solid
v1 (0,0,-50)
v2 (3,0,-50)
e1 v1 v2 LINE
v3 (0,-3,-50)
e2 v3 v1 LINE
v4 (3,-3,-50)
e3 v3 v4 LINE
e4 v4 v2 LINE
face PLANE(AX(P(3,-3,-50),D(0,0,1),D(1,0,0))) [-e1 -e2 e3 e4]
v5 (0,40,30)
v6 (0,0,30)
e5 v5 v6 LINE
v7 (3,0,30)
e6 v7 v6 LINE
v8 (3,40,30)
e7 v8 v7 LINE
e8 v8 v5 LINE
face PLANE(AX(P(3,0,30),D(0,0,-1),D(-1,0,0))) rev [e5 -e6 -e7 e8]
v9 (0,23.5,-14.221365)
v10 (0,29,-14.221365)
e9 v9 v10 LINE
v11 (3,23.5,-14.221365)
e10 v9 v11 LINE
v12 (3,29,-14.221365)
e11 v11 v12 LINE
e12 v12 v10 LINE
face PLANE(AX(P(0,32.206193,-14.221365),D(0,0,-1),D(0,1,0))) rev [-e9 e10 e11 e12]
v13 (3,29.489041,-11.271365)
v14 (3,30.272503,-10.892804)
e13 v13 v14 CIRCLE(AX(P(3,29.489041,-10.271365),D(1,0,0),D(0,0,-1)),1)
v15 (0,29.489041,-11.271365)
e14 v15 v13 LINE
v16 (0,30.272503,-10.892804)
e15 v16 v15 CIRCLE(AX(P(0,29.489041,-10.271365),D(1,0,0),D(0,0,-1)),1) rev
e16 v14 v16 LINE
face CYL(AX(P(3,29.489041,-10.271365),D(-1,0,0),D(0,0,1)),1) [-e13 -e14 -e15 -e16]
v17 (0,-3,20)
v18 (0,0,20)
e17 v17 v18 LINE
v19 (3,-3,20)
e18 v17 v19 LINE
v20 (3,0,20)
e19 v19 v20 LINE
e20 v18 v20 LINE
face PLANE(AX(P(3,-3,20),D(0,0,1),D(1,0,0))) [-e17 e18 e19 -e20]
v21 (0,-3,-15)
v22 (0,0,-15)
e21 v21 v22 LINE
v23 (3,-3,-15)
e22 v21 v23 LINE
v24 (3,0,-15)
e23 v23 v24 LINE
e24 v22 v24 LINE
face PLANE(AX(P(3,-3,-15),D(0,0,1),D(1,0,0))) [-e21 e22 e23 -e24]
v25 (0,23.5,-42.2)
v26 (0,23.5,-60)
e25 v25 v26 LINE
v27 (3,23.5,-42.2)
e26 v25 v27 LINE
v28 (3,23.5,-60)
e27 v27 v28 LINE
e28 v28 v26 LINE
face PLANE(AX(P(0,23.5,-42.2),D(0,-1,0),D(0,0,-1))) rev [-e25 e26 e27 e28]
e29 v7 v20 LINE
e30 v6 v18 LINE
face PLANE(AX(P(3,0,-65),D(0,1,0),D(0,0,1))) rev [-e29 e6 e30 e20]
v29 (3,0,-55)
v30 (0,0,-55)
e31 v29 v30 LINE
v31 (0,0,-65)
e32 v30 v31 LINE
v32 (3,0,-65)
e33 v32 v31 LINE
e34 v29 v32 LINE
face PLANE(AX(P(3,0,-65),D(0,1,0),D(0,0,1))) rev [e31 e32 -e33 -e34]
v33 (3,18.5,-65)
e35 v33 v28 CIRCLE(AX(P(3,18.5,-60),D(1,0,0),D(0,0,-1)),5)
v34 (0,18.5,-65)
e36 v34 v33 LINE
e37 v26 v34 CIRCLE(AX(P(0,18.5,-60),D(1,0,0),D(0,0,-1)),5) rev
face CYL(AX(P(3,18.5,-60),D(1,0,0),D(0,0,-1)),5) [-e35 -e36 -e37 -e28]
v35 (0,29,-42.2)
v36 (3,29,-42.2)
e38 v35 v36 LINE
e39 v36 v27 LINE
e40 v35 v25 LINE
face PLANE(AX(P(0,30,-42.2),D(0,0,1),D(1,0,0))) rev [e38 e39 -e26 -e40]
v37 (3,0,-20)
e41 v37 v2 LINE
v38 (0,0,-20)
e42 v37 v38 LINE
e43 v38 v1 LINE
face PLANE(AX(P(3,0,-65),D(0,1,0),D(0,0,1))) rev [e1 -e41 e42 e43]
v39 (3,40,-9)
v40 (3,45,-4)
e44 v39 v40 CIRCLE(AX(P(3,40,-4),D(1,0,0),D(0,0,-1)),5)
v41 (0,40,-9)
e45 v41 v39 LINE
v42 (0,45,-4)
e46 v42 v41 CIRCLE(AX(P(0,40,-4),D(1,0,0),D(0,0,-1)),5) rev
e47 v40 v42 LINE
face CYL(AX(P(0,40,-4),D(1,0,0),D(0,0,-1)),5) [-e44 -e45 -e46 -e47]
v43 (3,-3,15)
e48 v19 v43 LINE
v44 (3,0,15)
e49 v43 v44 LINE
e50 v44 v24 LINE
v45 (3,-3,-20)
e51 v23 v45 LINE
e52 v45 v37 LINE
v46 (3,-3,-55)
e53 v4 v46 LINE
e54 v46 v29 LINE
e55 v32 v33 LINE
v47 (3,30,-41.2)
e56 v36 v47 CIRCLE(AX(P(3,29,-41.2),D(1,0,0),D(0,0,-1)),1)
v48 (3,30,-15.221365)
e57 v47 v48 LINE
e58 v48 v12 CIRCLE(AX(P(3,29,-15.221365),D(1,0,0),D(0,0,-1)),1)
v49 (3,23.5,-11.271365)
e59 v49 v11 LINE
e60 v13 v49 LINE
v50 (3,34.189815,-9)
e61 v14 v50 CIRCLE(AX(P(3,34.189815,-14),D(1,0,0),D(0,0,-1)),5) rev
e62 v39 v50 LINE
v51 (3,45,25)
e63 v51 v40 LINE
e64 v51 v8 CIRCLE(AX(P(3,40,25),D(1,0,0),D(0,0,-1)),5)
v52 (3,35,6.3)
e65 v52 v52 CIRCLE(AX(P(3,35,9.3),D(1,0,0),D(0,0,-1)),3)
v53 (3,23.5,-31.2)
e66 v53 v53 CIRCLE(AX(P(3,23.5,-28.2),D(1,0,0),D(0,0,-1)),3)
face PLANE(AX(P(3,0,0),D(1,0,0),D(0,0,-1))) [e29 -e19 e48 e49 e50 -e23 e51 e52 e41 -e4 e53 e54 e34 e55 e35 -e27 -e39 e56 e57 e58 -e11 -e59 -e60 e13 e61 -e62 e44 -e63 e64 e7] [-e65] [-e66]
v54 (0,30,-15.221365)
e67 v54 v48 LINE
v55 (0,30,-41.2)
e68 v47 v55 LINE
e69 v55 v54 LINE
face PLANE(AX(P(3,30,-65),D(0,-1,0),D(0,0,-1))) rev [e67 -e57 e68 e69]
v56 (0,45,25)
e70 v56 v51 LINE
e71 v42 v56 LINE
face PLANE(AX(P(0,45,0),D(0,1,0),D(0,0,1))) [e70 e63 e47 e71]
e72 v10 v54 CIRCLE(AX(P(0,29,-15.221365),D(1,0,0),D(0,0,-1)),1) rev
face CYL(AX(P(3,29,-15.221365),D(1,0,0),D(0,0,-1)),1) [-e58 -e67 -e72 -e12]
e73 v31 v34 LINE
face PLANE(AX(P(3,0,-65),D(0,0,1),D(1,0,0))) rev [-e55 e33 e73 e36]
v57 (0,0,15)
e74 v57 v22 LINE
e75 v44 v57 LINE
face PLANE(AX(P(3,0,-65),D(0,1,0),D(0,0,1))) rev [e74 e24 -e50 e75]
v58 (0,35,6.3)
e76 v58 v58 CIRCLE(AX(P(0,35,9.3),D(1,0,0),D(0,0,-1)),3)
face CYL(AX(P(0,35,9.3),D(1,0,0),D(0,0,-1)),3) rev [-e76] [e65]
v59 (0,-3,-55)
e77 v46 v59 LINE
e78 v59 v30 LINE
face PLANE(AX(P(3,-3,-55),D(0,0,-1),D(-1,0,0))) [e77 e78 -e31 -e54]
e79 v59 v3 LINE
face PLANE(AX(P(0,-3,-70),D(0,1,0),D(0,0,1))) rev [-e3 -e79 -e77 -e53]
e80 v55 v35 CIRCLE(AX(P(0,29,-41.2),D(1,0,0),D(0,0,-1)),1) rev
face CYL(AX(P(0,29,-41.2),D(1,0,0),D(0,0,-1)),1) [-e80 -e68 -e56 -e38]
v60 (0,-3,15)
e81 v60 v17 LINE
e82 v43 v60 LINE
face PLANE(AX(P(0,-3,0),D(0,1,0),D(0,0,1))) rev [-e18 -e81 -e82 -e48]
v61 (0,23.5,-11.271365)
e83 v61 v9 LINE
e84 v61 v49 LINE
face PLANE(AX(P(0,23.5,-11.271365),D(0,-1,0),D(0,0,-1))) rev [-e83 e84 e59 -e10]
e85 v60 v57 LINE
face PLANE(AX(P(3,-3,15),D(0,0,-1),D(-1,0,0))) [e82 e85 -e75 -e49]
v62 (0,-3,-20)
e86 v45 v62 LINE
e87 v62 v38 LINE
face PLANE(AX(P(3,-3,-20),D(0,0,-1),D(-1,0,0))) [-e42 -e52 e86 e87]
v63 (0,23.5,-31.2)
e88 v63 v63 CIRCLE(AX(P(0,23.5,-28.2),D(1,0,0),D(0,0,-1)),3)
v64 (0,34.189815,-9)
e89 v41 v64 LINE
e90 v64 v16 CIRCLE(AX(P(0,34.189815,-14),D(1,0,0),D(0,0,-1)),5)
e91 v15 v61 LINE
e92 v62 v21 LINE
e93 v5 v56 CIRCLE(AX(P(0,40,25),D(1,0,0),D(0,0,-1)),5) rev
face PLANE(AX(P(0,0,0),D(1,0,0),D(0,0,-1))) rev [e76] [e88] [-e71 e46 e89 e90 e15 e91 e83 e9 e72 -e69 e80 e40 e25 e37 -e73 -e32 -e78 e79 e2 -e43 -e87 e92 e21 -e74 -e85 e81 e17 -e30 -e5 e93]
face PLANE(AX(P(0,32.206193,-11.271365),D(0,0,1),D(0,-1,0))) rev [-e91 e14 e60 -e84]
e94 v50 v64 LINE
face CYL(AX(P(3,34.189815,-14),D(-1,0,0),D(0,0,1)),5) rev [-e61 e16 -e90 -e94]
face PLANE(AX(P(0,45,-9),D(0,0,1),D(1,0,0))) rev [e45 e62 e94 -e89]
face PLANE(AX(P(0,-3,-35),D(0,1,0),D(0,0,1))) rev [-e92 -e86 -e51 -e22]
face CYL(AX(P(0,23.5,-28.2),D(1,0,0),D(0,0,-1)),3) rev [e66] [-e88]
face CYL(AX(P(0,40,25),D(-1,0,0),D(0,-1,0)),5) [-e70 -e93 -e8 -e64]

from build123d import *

# Parameters (mm, degrees)
SKETCH1_W           = 95
SKETCH1_H           = 30
BOSS_EXTRUDE1_DEPTH = 3
SKETCH4_W           = 3
SKETCH4_H           = 5
BOSS_EXTRUDE2_DEPTH = 3
SKETCH5_W           = 3
SKETCH5_H           = 39
BOSS_EXTRUDE3_DEPTH = 15
SKETCH2_R           = 3
CUT_EXTRUDE1_DEPTH  = 80.113842025
LPATTERN1_COUNT     = 3
LPATTERN1_PITCH     = 35
SKETCH6_W           = 2.95
SKETCH6_H           = 8.706192548
SKETCH6_W_2         = 22.8
SKETCH6_H_2         = 6.5
CUT_EXTRUDE2_DEPTH  = 80.113842025
FILLET3_R           = 5
FILLET4_R           = 1


with BuildPart() as part:
    # Sketch1 → Boss-Extrude1 (new body)
    with BuildSketch(Plane(origin=(0, 0, 0), x_dir=(0, 0, -1), z_dir=(1, 0, 0))):
        with Locations((17.5, 15)):
            Rectangle(SKETCH1_W, SKETCH1_H)
    extrude(amount=BOSS_EXTRUDE1_DEPTH)

    # Sketch4 → Boss-Extrude2 (add)
    with BuildSketch(Plane(origin=(0, 0, 0), x_dir=(1, 0, 0), z_dir=(0, 1, 0))):
        with Locations((1.5, -17.5)):
            Rectangle(SKETCH4_W, SKETCH4_H)
    boss_extrude2 = extrude(amount=-BOSS_EXTRUDE2_DEPTH)

    # Sketch5 → Boss-Extrude3 (add)
    with BuildSketch(Plane(origin=(0, 30, 0), x_dir=(1, 0, 0), z_dir=(0, 1, 0))):
        with Locations((1.5, -10.5)):
            Rectangle(SKETCH5_W, SKETCH5_H)
    extrude(amount=BOSS_EXTRUDE3_DEPTH)

    # Sketch2 → Cut-Extrude1 (cut, through all)
    with BuildSketch(Plane(origin=(3, 0, 0), x_dir=(0, 0, -1), z_dir=(1, 0, 0))):
        with Locations((28.2, 23.5)):
            Circle(SKETCH2_R)
        with Locations((-9.3, 35)):
            Circle(SKETCH2_R)
    extrude(amount=-CUT_EXTRUDE1_DEPTH, mode=Mode.SUBTRACT)

    # LPattern1: Boss-Extrude2 ×3
    with Locations(*[(0, 0, -i * LPATTERN1_PITCH) for i in range(1, LPATTERN1_COUNT)]):
        add(boss_extrude2)

    # Sketch6 → Cut-Extrude2 (cut, through all)
    with BuildSketch(Plane(origin=(3, 0, 0), x_dir=(0, 0, -1), z_dir=(1, 0, 0))):
        with Locations((12.746364518, 27.853096274)):
            Rectangle(SKETCH6_W, SKETCH6_H)
        with Locations((53.6, 26.75)):
            Rectangle(SKETCH6_W_2, SKETCH6_H_2)
    extrude(amount=-CUT_EXTRUDE2_DEPTH, mode=Mode.SUBTRACT)

    # Fillet3
    # the kernel refuses this fillet: 5 mm, written as the material it adds along each edge
    with BuildSketch(Plane(origin=(0, 30, -9), x_dir=(0, 1.1824837095993706e-12, -1.0), z_dir=(1, 0, 0))) as fillet3_piece_1:
        with BuildLine():
            CenterArc((5, 4.189814842), FILLET3_R, 180, 56.925635132)
            Line((0, 4.189814842), (0, 0))
            Line((0, 0), (2.271364518, 0))
        make_face()
    extrude(amount=3)
    # the kernel refuses this fillet: 5 mm, written as the material it takes off along each edge
    with BuildSketch(Plane(origin=(15.5, 45, 30), x_dir=(0, 0, -1), z_dir=(-1, 0, 0)), Plane(origin=(15.5, 23.5, -65), x_dir=(0, -1, 0), z_dir=(-1, 0, 0))) as fillet3_2_piece_1:
        with BuildLine():
            CenterArc((FILLET3_R, FILLET3_R), FILLET3_R, 180, 90)
            Line((0, FILLET3_R), (0, 0))
            Line((0, 0), (FILLET3_R, 0))
        make_face()
    extrude(amount=28, mode=Mode.SUBTRACT)
    with BuildSketch(Plane(origin=(-12.5, 45, -9), x_dir=(0, -1, 0), z_dir=(1, 0, 0))) as fillet3_2_piece_2:
        with BuildLine():
            CenterArc((FILLET3_R, -FILLET3_R), FILLET3_R, 90, 90)
            Line((0, -FILLET3_R), (0, 0))
            Line((0, 0), (FILLET3_R, 0))
        make_face()
    extrude(amount=28, mode=Mode.SUBTRACT)

    # Fillet4
    fillet4_edges = [part.edges().sort_by_distance(p)[0] for p in [
        (1.5, 30, -11.271364518),
        (1.5, 30, -14.221364518),
        (1.5, 30, -42.2),
    ]]
    fillet(fillet4_edges, radius=FILLET4_R)


solid = part.part
